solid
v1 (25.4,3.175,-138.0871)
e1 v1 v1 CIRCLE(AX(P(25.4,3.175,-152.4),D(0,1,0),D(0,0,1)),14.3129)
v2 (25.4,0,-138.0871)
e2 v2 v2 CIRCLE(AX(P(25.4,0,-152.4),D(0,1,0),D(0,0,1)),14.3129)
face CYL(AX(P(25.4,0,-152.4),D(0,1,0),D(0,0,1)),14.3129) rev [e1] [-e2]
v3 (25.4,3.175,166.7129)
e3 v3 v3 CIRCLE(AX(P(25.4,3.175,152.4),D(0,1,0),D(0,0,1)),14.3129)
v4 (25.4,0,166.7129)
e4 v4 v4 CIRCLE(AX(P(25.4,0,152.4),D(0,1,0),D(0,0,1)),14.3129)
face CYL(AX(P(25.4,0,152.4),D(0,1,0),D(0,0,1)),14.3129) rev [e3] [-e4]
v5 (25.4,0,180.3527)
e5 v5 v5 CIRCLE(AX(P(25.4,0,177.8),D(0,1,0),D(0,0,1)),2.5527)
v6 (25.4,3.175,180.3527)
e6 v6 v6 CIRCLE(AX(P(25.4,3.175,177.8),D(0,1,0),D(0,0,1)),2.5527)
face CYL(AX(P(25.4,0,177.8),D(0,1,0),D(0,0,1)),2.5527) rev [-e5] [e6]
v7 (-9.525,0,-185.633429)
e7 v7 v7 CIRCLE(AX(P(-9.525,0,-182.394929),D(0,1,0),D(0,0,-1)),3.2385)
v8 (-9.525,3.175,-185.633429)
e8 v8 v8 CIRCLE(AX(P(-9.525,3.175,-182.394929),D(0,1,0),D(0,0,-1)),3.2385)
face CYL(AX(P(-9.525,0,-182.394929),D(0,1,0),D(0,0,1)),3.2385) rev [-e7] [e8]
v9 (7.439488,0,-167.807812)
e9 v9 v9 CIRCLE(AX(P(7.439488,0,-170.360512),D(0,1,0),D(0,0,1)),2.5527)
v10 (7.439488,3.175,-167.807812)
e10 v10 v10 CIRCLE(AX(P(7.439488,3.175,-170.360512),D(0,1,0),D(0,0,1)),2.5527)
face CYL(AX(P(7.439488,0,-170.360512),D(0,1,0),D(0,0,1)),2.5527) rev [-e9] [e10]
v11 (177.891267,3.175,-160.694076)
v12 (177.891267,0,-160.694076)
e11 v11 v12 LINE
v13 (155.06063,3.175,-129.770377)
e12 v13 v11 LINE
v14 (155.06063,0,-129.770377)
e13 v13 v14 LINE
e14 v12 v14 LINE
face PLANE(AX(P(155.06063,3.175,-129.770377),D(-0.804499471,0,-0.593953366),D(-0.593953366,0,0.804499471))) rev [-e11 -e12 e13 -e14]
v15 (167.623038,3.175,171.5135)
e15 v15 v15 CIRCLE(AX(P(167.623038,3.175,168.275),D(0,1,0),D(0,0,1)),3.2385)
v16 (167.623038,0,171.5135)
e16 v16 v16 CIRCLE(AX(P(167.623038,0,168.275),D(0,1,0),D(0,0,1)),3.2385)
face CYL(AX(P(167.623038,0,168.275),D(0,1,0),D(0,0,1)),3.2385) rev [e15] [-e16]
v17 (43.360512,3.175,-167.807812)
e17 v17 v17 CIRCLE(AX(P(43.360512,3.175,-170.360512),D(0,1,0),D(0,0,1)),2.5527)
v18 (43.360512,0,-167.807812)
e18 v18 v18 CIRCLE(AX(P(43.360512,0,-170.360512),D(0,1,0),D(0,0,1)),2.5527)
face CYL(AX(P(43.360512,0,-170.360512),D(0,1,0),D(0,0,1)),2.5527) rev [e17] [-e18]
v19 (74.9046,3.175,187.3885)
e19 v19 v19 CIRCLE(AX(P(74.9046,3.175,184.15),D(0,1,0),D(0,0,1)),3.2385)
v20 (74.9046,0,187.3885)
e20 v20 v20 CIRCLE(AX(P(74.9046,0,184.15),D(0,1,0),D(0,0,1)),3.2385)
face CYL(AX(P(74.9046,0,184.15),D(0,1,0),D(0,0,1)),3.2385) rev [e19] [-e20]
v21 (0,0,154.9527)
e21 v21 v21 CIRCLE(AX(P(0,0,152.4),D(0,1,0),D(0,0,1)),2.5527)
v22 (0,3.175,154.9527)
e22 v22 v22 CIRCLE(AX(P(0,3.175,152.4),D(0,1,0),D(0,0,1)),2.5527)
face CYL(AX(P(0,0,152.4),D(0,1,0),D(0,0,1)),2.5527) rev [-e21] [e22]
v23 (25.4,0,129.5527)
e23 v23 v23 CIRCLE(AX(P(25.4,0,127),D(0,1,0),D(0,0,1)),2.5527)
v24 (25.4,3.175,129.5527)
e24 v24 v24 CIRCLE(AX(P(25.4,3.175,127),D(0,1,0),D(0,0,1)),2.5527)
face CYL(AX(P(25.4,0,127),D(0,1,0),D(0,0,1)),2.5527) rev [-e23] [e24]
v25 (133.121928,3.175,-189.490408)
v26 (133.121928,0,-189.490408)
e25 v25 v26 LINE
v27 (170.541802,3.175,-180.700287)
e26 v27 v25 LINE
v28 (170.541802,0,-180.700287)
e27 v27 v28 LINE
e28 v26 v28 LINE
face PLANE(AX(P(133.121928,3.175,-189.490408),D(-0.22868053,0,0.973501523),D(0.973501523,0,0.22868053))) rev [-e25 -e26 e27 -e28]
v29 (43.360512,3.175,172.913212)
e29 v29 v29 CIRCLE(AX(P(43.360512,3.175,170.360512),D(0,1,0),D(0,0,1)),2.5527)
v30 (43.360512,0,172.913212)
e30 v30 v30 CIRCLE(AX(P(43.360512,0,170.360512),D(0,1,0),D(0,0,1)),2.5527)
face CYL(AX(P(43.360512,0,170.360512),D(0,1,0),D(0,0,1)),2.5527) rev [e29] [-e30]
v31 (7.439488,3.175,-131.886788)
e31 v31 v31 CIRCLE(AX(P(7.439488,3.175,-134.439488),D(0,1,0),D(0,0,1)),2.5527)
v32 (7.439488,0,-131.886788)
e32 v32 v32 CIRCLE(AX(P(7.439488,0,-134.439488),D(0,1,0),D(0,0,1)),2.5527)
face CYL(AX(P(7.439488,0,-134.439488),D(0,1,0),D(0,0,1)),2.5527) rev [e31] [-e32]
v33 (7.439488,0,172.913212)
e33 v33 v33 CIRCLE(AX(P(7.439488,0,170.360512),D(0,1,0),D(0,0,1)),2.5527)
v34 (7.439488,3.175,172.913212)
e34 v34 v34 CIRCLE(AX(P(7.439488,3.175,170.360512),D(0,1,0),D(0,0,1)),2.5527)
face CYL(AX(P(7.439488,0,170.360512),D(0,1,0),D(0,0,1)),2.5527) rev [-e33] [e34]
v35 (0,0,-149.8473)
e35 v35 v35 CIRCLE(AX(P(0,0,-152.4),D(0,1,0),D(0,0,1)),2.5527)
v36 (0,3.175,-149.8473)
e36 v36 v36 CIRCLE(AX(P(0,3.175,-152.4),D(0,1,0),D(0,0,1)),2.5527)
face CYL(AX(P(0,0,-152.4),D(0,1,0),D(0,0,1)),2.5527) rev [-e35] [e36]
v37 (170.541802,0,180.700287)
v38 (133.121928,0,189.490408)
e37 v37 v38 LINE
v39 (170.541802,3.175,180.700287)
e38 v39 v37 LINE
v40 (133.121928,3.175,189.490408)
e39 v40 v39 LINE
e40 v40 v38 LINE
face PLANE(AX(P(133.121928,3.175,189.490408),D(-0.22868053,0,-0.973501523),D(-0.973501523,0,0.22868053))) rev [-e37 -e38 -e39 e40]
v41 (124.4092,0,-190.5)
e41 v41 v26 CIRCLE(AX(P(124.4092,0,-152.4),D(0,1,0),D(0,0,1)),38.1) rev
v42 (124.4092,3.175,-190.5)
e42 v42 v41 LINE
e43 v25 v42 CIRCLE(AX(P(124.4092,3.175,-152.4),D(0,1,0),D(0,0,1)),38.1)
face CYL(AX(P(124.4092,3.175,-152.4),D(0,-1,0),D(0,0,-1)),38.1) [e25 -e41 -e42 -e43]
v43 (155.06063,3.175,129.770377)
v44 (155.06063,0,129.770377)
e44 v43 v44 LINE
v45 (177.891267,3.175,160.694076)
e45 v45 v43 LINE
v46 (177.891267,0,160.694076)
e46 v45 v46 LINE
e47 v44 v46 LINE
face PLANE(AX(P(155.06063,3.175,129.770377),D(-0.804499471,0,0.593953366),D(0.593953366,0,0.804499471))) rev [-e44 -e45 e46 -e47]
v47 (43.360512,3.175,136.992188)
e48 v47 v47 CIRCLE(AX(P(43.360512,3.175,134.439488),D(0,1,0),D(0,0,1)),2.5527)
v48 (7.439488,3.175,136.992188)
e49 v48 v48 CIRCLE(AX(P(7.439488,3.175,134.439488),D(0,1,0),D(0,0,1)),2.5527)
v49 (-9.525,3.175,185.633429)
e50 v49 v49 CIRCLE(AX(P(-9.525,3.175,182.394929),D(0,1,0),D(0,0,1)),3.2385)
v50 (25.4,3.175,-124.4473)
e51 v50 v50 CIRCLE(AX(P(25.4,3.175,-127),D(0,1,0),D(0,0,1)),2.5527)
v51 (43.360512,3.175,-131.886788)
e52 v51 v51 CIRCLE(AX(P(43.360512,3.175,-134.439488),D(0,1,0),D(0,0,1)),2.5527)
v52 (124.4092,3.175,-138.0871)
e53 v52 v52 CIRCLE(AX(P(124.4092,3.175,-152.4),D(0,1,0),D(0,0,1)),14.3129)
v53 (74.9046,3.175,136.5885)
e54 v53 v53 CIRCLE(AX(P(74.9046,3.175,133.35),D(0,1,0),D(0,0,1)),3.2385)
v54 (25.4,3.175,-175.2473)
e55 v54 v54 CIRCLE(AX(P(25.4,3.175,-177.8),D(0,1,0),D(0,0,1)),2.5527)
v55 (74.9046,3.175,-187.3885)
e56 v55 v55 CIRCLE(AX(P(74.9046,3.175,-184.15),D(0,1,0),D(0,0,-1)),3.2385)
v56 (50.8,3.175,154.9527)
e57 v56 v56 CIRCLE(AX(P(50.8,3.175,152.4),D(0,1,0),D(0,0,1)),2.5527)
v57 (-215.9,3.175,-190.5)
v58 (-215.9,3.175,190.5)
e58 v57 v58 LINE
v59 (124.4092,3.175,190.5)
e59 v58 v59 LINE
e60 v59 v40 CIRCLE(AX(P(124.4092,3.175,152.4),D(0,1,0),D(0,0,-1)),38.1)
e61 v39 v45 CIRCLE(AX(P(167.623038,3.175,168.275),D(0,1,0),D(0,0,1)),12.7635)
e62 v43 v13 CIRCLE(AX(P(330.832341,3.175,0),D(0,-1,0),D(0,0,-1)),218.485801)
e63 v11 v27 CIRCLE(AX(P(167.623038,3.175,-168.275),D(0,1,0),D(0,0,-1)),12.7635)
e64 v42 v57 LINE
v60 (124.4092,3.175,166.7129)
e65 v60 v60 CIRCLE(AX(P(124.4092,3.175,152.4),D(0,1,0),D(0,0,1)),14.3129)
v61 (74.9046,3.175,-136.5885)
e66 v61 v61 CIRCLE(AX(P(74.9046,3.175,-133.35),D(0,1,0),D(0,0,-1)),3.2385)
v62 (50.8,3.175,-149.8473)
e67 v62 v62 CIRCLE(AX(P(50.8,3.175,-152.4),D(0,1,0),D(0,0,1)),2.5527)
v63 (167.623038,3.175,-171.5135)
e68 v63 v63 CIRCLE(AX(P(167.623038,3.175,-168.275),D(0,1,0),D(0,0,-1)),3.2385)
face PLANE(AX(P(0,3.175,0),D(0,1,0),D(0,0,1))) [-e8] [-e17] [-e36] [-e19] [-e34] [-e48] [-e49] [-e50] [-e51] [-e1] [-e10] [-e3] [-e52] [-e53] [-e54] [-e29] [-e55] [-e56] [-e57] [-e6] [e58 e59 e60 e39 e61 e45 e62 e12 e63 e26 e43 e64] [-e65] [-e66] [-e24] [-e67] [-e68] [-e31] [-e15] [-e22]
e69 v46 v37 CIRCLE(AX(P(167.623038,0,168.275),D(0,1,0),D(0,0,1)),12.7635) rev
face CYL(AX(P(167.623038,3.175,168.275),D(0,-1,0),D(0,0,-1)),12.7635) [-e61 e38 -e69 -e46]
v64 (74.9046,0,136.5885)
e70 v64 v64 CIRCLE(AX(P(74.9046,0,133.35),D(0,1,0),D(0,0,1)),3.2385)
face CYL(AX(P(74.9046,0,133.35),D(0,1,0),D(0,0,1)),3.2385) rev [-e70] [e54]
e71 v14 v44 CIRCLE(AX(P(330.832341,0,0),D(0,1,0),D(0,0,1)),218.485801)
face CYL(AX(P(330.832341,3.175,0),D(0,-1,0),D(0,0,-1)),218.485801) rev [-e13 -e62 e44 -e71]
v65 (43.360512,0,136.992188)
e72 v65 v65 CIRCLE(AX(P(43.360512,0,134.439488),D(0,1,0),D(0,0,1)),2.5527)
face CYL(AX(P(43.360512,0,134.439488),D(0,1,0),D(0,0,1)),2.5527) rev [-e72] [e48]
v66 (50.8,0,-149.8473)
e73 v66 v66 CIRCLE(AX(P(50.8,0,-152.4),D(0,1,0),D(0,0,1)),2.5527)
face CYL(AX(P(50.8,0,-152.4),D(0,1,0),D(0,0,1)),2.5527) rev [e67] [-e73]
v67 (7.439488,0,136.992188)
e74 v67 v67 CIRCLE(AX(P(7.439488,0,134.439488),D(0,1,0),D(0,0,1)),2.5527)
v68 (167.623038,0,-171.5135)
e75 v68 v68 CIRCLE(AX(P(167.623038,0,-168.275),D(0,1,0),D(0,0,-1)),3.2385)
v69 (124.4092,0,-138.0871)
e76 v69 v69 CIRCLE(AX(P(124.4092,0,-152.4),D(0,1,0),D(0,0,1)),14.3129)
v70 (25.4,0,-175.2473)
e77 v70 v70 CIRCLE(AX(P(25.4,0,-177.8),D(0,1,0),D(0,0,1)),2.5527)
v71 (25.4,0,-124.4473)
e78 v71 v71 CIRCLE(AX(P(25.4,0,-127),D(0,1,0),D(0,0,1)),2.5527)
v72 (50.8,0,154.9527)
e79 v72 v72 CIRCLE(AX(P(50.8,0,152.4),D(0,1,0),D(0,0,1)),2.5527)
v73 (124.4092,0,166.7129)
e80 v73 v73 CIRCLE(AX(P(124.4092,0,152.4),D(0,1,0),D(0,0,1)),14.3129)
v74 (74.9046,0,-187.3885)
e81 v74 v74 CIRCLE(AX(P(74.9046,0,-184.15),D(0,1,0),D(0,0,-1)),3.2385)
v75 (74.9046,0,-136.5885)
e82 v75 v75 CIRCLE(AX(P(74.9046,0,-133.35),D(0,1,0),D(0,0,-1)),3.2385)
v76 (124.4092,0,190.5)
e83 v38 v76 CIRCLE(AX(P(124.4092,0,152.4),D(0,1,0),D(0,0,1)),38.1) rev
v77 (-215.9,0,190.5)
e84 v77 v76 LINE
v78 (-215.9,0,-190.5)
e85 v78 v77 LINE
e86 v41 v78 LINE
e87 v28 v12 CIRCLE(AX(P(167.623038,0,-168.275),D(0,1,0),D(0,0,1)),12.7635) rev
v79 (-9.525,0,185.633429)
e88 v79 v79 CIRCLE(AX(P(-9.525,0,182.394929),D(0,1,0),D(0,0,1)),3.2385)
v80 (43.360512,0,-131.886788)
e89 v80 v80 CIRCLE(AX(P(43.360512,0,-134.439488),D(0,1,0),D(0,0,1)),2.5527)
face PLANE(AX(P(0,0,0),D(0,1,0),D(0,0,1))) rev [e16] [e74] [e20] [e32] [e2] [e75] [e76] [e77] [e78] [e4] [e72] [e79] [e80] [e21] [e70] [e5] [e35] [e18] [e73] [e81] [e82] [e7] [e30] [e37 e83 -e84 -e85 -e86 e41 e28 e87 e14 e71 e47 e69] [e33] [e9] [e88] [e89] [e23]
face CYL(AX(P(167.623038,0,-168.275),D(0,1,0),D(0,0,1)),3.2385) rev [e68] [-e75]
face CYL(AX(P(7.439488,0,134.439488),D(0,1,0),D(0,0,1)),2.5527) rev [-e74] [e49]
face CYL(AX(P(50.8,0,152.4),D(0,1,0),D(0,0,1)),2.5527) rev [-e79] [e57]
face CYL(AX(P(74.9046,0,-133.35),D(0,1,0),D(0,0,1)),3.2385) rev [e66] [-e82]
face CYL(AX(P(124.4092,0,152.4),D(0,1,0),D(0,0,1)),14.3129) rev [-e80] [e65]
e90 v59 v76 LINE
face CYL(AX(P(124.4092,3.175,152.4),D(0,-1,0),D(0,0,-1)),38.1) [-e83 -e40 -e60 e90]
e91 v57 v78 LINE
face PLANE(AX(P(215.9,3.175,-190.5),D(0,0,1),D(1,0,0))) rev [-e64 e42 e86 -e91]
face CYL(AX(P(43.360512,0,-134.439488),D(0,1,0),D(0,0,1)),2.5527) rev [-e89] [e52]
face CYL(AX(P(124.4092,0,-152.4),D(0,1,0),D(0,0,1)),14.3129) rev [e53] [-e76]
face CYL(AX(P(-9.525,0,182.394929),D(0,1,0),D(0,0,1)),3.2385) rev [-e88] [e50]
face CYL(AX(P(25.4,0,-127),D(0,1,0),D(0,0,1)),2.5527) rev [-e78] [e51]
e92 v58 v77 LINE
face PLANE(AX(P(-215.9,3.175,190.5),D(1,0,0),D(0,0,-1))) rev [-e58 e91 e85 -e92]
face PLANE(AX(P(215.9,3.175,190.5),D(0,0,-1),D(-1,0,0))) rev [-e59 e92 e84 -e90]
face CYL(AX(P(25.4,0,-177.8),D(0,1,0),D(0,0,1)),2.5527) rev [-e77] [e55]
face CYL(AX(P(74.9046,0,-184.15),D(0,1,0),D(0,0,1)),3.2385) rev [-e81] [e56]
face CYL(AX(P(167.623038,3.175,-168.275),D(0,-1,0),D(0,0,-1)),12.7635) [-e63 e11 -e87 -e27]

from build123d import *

# Parameters (mm, degrees)
SKETCH1_W           = 431.8
SKETCH1_H           = 381
BOSS_EXTRUDE1_DEPTH = 3.175
SKETCH7_R           = 14.3129
SKETCH7_R_2         = 2.5527
AXLE_HOLES_DEPTH    = 288.946419712
SKETCH10_R          = 3.2385
CUT_EXTRUDE5_DEPTH  = 288.946419712
CUT_EXTRUDE4_START  = -3.175
CUT_EXTRUDE4_DEPTH  = 3.175


# Read off the part's stored shape, not the designer's step: Cut-Extrude4
with BuildPart() as part:
    # Sketch1 → Boss-Extrude1 (new body)
    with BuildSketch(Plane(origin=(0, 0, 0), x_dir=(1, 0, 0), z_dir=(0, 1, 0))):
        Rectangle(SKETCH1_W, SKETCH1_H)
    extrude(amount=BOSS_EXTRUDE1_DEPTH)

    # Sketch7 → Axle Holes (cut, through all)
    with BuildSketch(Plane(origin=(0, 3.175, 0), x_dir=(1, 0, 0), z_dir=(0, 1, 0))):
        with Locations(Location((124.4092, -152.4, 0), (0, 0, 270))):
            Circle(SKETCH7_R)
        with Locations(Location((124.4092, 152.4, 0), (0, 0, 270))):
            Circle(SKETCH7_R)
        with Locations(Location((25.4, 152.4, 0), (0, 0, 270))):
            Circle(SKETCH7_R)
        with Locations(Location((25.4, -152.4, 0), (0, 0, 270))):
            Circle(SKETCH7_R)
        with Locations(Location((0, 152.4, 0), (0, 0, 270))):
            Circle(SKETCH7_R_2)
        with Locations(Location((7.439487758, 170.360512242, 0), (0, 0, 270))):
            Circle(SKETCH7_R_2)
        with Locations(Location((25.4, 177.8, 0), (0, 0, 270))):
            Circle(SKETCH7_R_2)
        with Locations(Location((43.360512242, 170.360512242, 0), (0, 0, 270))):
            Circle(SKETCH7_R_2)
        with Locations(Location((25.4, -127, 0), (0, 0, 270))):
            Circle(SKETCH7_R_2)
        with Locations(Location((43.360512242, -134.439487758, 0), (0, 0, 270))):
            Circle(SKETCH7_R_2)
        with Locations(Location((50.8, -152.4, 0), (0, 0, 270))):
            Circle(SKETCH7_R_2)
        with Locations(Location((43.360512242, -170.360512242, 0), (0, 0, 270))):
            Circle(SKETCH7_R_2)
        with Locations(Location((50.8, 152.4, 0), (0, 0, 270))):
            Circle(SKETCH7_R_2)
        with Locations(Location((43.360512242, 134.439487758, 0), (0, 0, 270))):
            Circle(SKETCH7_R_2)
        with Locations(Location((25.4, 127, 0), (0, 0, 270))):
            Circle(SKETCH7_R_2)
        with Locations(Location((7.439487758, 134.439487758, 0), (0, 0, 270))):
            Circle(SKETCH7_R_2)
        with Locations(Location((25.4, -177.8, 0), (0, 0, 270))):
            Circle(SKETCH7_R_2)
        with Locations(Location((7.439487758, -170.360512242, 0), (0, 0, 270))):
            Circle(SKETCH7_R_2)
        with Locations(Location((0, -152.4, 0), (0, 0, 270))):
            Circle(SKETCH7_R_2)
        with Locations(Location((7.439487758, -134.439487758, 0), (0, 0, 270))):
            Circle(SKETCH7_R_2)
    extrude(amount=-AXLE_HOLES_DEPTH, mode=Mode.SUBTRACT)

    # Sketch10 → Cut-Extrude5 (cut, through all)
    with BuildSketch(Plane(origin=(0, 3.175, 0), x_dir=(1, 0, 0), z_dir=(0, 1, 0))):
        with Locations(Location((-9.525, -182.394929259, 0), (0, 0, 270))):
            Circle(SKETCH10_R)
        with Locations(Location((74.9046, -184.15, 0), (0, 0, 270))):
            Circle(SKETCH10_R)
        with Locations(Location((74.9046, -133.35, 0), (0, 0, 270))):
            Circle(SKETCH10_R)
        with Locations(Location((167.623037844, -168.275, 0), (0, 0, 270))):
            Circle(SKETCH10_R)
        with Locations(Location((167.623037844, 168.275, 0), (0, 0, 90))):
            Circle(SKETCH10_R)
        with Locations(Location((74.9046, 184.15, 0), (0, 0, 90))):
            Circle(SKETCH10_R)
        with Locations(Location((74.9046, 133.35, 0), (0, 0, 90))):
            Circle(SKETCH10_R)
        with Locations(Location((-9.525, 182.394929259, 0), (0, 0, 90))):
            Circle(SKETCH10_R)
    extrude(amount=-CUT_EXTRUDE5_DEPTH, mode=Mode.SUBTRACT)

    # Cut-Extrude4 outline → Cut-Extrude4 (cut)
    with BuildSketch(Plane(origin=(0, 3.175, 0), x_dir=(1, 0, 0), z_dir=(0, 1, 0)).offset(CUT_EXTRUDE4_START)):
        with BuildLine():
            Line((170.541801783, -180.70028669), (133.121928175, -189.490408029))
            ThreePointArc((133.121928175, -189.490408029), (128.794713317, -190.246760402), (124.4092, -190.5))
            Line((124.4092, -190.5), (215.9, -190.5))
            Line((215.9, -190.5), (215.9, 190.5))
            Line((215.9, 190.5), (124.4092, 190.5))
            ThreePointArc((124.4092, 190.5), (128.794713317, 190.246760402), (133.121928175, 189.490408029))
            Line((133.121928175, 189.490408029), (170.541801783, 180.70028669))
            ThreePointArc((170.541801783, 180.70028669), (179.603701854, 172.676206897), (177.891266843, 160.694076212))
            Line((177.891266843, 160.694076212), (155.060629846, 129.770376751))
            ThreePointArc((155.060629846, 129.770376751), (112.346540244, 0), (155.060629846, -129.770376751))
            Line((155.060629846, -129.770376751), (177.891266843, -160.694076212))
            ThreePointArc((177.891266843, -160.694076212), (179.603701854, -172.676206897), (170.541801783, -180.70028669))
        make_face()
    extrude(amount=CUT_EXTRUDE4_DEPTH, mode=Mode.SUBTRACT)


solid = part.part
